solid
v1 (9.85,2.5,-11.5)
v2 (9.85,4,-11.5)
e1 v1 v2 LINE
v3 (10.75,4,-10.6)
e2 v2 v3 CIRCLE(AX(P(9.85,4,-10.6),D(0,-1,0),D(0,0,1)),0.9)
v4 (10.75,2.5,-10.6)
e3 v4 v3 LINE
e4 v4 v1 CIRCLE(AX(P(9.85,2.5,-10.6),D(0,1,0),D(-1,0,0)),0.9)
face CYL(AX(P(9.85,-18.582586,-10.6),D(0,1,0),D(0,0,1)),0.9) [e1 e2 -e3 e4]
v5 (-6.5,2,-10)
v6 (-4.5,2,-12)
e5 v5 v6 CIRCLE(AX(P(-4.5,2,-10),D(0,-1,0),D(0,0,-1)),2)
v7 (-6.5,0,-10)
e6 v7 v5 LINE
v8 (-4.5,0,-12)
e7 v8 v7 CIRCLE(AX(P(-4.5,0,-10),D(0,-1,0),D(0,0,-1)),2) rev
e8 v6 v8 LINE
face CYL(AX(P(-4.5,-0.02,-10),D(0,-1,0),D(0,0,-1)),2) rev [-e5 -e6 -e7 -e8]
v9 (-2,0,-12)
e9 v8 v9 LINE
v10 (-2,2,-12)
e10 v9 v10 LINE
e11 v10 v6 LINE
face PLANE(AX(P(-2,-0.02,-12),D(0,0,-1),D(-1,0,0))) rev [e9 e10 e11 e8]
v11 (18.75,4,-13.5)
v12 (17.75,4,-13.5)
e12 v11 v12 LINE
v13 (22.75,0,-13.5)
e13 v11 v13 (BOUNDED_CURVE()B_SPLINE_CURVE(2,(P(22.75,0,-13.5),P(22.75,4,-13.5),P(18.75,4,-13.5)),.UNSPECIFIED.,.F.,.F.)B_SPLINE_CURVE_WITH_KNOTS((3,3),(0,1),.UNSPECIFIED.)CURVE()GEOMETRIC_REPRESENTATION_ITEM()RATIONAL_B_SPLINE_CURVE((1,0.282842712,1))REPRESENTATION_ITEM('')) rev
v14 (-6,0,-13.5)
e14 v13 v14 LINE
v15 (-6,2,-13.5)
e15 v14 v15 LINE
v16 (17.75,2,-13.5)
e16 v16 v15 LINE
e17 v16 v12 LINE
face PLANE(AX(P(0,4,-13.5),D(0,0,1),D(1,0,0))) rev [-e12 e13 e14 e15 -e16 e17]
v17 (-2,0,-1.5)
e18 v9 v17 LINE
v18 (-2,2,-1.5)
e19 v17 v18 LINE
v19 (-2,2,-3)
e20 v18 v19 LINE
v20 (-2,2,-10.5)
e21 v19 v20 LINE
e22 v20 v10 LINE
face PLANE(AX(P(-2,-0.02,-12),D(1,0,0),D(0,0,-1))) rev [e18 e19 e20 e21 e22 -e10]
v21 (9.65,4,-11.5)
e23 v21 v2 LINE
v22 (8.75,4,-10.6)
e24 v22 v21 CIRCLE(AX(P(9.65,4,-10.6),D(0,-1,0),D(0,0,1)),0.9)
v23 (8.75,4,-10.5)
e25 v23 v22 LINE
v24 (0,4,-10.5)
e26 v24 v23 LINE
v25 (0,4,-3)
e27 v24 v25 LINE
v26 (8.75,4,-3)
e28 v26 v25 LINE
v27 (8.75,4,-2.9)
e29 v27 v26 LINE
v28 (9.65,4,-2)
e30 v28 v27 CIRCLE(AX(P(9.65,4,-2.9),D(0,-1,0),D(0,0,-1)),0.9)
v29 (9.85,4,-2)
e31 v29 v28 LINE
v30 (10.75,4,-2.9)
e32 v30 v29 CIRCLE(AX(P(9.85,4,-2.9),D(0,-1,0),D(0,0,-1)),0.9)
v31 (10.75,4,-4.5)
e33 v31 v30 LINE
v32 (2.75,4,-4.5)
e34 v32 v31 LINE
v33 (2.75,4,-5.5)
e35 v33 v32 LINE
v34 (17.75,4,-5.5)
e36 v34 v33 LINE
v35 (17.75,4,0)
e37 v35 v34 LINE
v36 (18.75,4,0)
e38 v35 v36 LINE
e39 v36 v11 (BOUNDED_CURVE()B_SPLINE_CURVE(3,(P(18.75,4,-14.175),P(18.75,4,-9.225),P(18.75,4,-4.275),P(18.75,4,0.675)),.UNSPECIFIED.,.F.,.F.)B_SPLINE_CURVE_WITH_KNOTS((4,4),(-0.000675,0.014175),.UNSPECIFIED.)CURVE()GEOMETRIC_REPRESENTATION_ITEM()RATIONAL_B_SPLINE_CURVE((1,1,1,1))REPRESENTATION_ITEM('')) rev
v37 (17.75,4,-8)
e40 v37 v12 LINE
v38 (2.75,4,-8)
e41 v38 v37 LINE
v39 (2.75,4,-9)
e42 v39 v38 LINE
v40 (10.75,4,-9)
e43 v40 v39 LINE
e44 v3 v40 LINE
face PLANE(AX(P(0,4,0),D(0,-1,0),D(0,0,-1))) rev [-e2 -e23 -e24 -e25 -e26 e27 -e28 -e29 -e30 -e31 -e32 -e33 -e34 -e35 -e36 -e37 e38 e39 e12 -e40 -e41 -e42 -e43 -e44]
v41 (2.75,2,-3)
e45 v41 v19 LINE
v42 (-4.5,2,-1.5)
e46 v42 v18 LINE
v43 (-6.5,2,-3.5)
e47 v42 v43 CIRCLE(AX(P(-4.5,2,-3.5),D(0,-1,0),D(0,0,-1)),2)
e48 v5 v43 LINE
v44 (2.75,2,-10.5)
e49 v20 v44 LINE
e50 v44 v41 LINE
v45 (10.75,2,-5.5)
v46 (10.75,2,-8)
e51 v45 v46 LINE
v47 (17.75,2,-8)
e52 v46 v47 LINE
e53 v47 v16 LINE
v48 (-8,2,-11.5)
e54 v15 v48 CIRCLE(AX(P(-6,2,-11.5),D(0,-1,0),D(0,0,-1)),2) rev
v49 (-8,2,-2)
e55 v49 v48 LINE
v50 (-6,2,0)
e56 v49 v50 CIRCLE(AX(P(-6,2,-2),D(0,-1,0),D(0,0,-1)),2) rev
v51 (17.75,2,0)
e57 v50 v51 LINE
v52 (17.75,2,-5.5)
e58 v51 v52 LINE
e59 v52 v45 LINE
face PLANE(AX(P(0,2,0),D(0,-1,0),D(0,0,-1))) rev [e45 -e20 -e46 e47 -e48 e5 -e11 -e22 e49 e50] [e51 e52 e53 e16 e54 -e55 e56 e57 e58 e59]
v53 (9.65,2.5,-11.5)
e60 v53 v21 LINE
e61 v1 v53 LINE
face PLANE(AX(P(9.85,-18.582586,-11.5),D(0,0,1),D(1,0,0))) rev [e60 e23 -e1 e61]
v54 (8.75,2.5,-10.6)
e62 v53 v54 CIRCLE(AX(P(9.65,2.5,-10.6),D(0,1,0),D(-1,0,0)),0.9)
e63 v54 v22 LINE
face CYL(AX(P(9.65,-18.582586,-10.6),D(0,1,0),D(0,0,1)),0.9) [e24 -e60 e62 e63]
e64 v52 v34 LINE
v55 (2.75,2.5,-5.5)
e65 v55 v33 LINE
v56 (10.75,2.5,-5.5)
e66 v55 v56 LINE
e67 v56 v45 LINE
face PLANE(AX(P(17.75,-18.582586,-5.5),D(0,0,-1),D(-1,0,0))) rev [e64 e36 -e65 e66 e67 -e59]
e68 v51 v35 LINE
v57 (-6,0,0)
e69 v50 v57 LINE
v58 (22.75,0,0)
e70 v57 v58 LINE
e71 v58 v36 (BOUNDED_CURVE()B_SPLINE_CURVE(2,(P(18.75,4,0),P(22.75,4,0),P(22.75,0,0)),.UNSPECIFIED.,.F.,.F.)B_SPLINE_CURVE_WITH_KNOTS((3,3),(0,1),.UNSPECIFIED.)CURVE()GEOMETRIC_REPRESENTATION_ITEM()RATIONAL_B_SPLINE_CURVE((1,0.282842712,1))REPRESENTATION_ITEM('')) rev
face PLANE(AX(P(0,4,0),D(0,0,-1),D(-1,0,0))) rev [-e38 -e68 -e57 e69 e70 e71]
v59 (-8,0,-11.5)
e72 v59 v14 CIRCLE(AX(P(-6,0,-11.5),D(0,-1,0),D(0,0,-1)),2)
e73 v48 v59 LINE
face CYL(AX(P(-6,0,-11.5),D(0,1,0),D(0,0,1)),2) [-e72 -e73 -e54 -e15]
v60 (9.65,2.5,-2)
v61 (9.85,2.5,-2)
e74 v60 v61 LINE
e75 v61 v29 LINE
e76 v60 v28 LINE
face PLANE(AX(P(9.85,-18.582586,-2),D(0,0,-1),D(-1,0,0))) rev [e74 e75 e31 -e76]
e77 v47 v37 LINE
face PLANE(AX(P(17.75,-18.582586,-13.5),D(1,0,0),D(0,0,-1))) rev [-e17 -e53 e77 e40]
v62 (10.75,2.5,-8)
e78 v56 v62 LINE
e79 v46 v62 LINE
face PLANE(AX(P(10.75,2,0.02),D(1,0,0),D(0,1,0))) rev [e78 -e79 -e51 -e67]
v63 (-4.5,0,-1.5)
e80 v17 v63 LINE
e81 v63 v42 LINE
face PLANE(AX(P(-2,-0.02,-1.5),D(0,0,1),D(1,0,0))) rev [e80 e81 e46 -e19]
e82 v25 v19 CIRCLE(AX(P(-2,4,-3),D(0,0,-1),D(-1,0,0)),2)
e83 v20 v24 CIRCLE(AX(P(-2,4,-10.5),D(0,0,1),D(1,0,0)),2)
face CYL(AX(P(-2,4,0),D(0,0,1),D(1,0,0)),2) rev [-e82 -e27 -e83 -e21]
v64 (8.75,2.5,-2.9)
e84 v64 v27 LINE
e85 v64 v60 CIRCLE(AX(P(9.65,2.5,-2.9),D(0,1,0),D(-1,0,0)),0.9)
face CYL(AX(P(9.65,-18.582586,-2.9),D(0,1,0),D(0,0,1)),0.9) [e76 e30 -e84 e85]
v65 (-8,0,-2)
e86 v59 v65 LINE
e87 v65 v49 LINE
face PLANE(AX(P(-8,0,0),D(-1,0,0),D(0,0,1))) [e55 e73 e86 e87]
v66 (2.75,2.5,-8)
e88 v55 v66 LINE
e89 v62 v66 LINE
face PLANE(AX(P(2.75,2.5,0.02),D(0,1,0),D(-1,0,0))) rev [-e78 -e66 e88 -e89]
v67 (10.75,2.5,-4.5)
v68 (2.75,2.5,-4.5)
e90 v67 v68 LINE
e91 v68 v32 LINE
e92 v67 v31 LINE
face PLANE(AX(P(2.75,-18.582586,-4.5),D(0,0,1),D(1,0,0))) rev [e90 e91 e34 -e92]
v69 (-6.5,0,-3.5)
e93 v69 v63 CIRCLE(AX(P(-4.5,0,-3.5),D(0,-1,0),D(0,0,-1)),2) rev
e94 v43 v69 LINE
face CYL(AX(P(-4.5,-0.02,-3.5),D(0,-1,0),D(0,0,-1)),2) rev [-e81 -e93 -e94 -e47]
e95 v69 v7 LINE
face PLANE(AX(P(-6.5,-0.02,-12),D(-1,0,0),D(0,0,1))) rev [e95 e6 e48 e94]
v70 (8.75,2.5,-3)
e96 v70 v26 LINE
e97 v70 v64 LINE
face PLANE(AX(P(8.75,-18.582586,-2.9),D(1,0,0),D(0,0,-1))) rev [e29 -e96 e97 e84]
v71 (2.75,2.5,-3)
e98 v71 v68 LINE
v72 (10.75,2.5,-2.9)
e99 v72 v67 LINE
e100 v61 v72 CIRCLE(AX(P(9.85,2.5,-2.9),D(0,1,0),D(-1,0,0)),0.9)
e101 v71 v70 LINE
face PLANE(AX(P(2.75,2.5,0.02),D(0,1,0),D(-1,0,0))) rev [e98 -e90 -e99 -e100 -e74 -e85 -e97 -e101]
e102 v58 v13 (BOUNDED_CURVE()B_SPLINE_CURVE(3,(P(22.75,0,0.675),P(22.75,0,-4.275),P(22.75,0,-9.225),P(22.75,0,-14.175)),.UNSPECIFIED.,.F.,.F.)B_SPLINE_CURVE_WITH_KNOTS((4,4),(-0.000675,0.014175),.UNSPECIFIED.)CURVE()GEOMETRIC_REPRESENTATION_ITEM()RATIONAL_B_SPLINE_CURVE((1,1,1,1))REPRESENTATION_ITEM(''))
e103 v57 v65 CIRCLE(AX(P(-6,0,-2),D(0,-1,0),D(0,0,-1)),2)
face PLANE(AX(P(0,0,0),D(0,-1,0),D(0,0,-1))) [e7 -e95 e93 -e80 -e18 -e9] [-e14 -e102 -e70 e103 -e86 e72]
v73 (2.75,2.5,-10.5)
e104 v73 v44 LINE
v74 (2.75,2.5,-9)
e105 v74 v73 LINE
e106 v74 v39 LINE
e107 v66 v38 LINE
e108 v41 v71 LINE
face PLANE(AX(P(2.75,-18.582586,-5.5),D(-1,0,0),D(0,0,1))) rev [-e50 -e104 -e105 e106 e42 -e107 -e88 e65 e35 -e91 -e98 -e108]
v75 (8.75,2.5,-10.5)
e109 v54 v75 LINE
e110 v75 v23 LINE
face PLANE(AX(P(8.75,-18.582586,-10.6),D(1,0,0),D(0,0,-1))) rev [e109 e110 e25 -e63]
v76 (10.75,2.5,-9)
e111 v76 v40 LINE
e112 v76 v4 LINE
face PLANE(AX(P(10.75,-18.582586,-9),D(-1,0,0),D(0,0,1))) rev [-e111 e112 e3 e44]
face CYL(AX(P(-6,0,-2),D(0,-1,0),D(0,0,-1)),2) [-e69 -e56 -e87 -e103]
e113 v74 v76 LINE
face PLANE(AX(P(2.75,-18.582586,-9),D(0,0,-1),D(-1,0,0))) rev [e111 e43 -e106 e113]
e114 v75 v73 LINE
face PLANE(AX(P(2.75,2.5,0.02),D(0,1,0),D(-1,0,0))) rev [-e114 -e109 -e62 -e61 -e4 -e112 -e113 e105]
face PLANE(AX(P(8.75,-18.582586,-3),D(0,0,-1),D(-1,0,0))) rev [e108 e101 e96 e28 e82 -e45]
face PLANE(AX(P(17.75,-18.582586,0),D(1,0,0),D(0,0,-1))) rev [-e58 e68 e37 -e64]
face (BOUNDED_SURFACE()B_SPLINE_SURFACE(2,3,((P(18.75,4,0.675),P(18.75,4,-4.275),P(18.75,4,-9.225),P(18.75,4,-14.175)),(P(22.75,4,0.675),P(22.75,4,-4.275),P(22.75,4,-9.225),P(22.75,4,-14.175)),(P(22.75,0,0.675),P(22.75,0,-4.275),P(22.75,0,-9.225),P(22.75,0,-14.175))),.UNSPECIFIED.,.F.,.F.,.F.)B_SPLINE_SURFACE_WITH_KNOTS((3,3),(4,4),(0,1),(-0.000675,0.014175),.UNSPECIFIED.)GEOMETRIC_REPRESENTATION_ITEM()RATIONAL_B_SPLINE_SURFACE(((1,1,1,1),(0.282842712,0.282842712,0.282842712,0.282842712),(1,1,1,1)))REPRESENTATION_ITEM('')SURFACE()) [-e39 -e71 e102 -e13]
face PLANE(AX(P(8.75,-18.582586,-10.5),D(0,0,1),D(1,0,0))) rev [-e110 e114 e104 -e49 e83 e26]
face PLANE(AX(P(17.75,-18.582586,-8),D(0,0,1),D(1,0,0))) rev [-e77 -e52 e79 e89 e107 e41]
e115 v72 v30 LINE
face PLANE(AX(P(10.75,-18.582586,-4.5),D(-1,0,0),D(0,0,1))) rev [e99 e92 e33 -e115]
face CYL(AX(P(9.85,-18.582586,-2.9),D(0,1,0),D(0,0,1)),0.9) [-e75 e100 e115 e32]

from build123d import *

# Parameters (mm, degrees)
SKETCH1_W               = 22.75
SKETCH1_H               = 13.5
BOSS_EXTRUDE1_DEPTH     = 4
FILLET1_SIZE            = 4
CUT_EXTRUDE1_DEPTH      = 2
CUT_EXTRUDE2_DEPTH      = 25.445091674
CUT_EXTRUDE2_DEPTH_BACK = 25.445091674
SKETCH5_W               = 8
SKETCH5_H               = 0.5
SKETCH4_W               = 13.5
SKETCH4_H               = 2
BOSS_EXTRUDE2_DEPTH     = 8
SKETCH6_W               = 4.5
SKETCH6_H               = 10.5
CUT_EXTRUDE3_DEPTH      = 27.529464896
FILLET3_R               = 2


# Some blends are built 0.0001 mm under size
with BuildPart() as part:
    # Sketch1 → Boss-Extrude1 (new body)
    with BuildSketch(Plane(origin=(0, 0, 0), x_dir=(1, 0, 0), z_dir=(0, 1, 0))):
        with Locations((11.375, 6.75)):
            Rectangle(SKETCH1_W, SKETCH1_H)
    extrude(amount=BOSS_EXTRUDE1_DEPTH)

    # Fillet1
    # a fillet whose section is not a circle: 4 mm, written as the material it takes off along each edge
    with BuildSketch(Plane(origin=(22.75, 4, 10), x_dir=(0, -1, 0), z_dir=(0, 0, -1))) as fillet1_piece_1:
        with BuildLine():
            Bezier((FILLET1_SIZE, 0), (0, 0), (0, FILLET1_SIZE), weights=[1, 0.282842712, 1])
            Line((0, FILLET1_SIZE), (0, 0))
            Line((0, 0), (FILLET1_SIZE, 0))
        make_face()
    extrude(amount=33.5, mode=Mode.SUBTRACT)

    # Sketch2 → Cut-Extrude1 (cut)
    with BuildSketch(Plane(origin=(0, 4, 0), x_dir=(1, 0, 0), z_dir=(0, 1, 0))):
        with BuildLine():
            Line((17.75, 0), (17.75, 5.5))
            Line((17.75, 5.5), (2.75, 5.5))
            Line((2.75, 5.5), (2.75, 4.5))
            Line((2.75, 4.5), (10.75, 4.5))
            Line((10.75, 4.5), (10.75, 2.9))
            ThreePointArc((10.75, 2.9), (10.486396103, 2.263603897), (9.85, 2))
            Line((9.85, 2), (9.65, 2))
            ThreePointArc((9.65, 2), (9.013603897, 2.263603897), (8.75, 2.9))
            Line((8.75, 2.9), (8.75, 3))
            Line((8.75, 3), (0, 3))
            Line((0, 3), (0, 0))
            Line((0, 0), (17.75, 0))
        make_face()
        with BuildLine():
            Line((0, 10.5), (0, 13.5))
            Line((0, 13.5), (17.75, 13.5))
            Line((17.75, 13.5), (17.75, 8))
            Line((17.75, 8), (2.75, 8))
            Line((2.75, 8), (2.75, 9))
            Line((2.75, 9), (10.75, 9))
            Line((10.75, 9), (10.75, 10.6))
            ThreePointArc((10.75, 10.6), (10.486396103, 11.236396103), (9.85, 11.5))
            Line((9.85, 11.5), (9.65, 11.5))
            ThreePointArc((9.65, 11.5), (9.013603897, 11.236396103), (8.75, 10.6))
            Line((8.75, 10.6), (8.75, 10.5))
            Line((8.75, 10.5), (0, 10.5))
        make_face()
    extrude(amount=-CUT_EXTRUDE1_DEPTH, mode=Mode.SUBTRACT)

    # Sketch5 → Cut-Extrude2 (cut, two sides: drawn at the far end of the back side and taken through both)
    with BuildSketch(Plane(origin=(0, 0, -8), x_dir=(-1, 0, 0), z_dir=(0, 0, -1)).offset(-CUT_EXTRUDE2_DEPTH_BACK)):
        with Locations((-6.75, 2.25)):
            Rectangle(SKETCH5_W, SKETCH5_H)
    extrude(amount=CUT_EXTRUDE2_DEPTH + CUT_EXTRUDE2_DEPTH_BACK, mode=Mode.SUBTRACT)

    # Sketch4 → Boss-Extrude2 (add)
    with BuildSketch(Plane.ZY):
        with Locations((-6.75, 1)):
            Rectangle(SKETCH4_W, SKETCH4_H)
    extrude(amount=BOSS_EXTRUDE2_DEPTH)

    # Sketch6 → Cut-Extrude3 (cut, through all)
    with BuildSketch(Plane(origin=(0, 2, 0), x_dir=(1, 0, 0), z_dir=(0, 1, 0))):
        with Locations((-4.25, 6.75)):
            Rectangle(SKETCH6_W, SKETCH6_H)
    extrude(amount=-CUT_EXTRUDE3_DEPTH, mode=Mode.SUBTRACT)

    # Fillet3
    fillet3_edges = [part.edges().sort_by_distance(p)[0] for p in [
        (-8, 1, 0),
        (-8, 1, -13.5),
        (-6.5, 1, -12),
        (-6.5, 1, -1.5),
        (0, 2, -6.75),
    ]]
    fillet(fillet3_edges, radius=FILLET3_R - 0.0001)  # a hair under: the kernel refuses the full size


solid = part.part
